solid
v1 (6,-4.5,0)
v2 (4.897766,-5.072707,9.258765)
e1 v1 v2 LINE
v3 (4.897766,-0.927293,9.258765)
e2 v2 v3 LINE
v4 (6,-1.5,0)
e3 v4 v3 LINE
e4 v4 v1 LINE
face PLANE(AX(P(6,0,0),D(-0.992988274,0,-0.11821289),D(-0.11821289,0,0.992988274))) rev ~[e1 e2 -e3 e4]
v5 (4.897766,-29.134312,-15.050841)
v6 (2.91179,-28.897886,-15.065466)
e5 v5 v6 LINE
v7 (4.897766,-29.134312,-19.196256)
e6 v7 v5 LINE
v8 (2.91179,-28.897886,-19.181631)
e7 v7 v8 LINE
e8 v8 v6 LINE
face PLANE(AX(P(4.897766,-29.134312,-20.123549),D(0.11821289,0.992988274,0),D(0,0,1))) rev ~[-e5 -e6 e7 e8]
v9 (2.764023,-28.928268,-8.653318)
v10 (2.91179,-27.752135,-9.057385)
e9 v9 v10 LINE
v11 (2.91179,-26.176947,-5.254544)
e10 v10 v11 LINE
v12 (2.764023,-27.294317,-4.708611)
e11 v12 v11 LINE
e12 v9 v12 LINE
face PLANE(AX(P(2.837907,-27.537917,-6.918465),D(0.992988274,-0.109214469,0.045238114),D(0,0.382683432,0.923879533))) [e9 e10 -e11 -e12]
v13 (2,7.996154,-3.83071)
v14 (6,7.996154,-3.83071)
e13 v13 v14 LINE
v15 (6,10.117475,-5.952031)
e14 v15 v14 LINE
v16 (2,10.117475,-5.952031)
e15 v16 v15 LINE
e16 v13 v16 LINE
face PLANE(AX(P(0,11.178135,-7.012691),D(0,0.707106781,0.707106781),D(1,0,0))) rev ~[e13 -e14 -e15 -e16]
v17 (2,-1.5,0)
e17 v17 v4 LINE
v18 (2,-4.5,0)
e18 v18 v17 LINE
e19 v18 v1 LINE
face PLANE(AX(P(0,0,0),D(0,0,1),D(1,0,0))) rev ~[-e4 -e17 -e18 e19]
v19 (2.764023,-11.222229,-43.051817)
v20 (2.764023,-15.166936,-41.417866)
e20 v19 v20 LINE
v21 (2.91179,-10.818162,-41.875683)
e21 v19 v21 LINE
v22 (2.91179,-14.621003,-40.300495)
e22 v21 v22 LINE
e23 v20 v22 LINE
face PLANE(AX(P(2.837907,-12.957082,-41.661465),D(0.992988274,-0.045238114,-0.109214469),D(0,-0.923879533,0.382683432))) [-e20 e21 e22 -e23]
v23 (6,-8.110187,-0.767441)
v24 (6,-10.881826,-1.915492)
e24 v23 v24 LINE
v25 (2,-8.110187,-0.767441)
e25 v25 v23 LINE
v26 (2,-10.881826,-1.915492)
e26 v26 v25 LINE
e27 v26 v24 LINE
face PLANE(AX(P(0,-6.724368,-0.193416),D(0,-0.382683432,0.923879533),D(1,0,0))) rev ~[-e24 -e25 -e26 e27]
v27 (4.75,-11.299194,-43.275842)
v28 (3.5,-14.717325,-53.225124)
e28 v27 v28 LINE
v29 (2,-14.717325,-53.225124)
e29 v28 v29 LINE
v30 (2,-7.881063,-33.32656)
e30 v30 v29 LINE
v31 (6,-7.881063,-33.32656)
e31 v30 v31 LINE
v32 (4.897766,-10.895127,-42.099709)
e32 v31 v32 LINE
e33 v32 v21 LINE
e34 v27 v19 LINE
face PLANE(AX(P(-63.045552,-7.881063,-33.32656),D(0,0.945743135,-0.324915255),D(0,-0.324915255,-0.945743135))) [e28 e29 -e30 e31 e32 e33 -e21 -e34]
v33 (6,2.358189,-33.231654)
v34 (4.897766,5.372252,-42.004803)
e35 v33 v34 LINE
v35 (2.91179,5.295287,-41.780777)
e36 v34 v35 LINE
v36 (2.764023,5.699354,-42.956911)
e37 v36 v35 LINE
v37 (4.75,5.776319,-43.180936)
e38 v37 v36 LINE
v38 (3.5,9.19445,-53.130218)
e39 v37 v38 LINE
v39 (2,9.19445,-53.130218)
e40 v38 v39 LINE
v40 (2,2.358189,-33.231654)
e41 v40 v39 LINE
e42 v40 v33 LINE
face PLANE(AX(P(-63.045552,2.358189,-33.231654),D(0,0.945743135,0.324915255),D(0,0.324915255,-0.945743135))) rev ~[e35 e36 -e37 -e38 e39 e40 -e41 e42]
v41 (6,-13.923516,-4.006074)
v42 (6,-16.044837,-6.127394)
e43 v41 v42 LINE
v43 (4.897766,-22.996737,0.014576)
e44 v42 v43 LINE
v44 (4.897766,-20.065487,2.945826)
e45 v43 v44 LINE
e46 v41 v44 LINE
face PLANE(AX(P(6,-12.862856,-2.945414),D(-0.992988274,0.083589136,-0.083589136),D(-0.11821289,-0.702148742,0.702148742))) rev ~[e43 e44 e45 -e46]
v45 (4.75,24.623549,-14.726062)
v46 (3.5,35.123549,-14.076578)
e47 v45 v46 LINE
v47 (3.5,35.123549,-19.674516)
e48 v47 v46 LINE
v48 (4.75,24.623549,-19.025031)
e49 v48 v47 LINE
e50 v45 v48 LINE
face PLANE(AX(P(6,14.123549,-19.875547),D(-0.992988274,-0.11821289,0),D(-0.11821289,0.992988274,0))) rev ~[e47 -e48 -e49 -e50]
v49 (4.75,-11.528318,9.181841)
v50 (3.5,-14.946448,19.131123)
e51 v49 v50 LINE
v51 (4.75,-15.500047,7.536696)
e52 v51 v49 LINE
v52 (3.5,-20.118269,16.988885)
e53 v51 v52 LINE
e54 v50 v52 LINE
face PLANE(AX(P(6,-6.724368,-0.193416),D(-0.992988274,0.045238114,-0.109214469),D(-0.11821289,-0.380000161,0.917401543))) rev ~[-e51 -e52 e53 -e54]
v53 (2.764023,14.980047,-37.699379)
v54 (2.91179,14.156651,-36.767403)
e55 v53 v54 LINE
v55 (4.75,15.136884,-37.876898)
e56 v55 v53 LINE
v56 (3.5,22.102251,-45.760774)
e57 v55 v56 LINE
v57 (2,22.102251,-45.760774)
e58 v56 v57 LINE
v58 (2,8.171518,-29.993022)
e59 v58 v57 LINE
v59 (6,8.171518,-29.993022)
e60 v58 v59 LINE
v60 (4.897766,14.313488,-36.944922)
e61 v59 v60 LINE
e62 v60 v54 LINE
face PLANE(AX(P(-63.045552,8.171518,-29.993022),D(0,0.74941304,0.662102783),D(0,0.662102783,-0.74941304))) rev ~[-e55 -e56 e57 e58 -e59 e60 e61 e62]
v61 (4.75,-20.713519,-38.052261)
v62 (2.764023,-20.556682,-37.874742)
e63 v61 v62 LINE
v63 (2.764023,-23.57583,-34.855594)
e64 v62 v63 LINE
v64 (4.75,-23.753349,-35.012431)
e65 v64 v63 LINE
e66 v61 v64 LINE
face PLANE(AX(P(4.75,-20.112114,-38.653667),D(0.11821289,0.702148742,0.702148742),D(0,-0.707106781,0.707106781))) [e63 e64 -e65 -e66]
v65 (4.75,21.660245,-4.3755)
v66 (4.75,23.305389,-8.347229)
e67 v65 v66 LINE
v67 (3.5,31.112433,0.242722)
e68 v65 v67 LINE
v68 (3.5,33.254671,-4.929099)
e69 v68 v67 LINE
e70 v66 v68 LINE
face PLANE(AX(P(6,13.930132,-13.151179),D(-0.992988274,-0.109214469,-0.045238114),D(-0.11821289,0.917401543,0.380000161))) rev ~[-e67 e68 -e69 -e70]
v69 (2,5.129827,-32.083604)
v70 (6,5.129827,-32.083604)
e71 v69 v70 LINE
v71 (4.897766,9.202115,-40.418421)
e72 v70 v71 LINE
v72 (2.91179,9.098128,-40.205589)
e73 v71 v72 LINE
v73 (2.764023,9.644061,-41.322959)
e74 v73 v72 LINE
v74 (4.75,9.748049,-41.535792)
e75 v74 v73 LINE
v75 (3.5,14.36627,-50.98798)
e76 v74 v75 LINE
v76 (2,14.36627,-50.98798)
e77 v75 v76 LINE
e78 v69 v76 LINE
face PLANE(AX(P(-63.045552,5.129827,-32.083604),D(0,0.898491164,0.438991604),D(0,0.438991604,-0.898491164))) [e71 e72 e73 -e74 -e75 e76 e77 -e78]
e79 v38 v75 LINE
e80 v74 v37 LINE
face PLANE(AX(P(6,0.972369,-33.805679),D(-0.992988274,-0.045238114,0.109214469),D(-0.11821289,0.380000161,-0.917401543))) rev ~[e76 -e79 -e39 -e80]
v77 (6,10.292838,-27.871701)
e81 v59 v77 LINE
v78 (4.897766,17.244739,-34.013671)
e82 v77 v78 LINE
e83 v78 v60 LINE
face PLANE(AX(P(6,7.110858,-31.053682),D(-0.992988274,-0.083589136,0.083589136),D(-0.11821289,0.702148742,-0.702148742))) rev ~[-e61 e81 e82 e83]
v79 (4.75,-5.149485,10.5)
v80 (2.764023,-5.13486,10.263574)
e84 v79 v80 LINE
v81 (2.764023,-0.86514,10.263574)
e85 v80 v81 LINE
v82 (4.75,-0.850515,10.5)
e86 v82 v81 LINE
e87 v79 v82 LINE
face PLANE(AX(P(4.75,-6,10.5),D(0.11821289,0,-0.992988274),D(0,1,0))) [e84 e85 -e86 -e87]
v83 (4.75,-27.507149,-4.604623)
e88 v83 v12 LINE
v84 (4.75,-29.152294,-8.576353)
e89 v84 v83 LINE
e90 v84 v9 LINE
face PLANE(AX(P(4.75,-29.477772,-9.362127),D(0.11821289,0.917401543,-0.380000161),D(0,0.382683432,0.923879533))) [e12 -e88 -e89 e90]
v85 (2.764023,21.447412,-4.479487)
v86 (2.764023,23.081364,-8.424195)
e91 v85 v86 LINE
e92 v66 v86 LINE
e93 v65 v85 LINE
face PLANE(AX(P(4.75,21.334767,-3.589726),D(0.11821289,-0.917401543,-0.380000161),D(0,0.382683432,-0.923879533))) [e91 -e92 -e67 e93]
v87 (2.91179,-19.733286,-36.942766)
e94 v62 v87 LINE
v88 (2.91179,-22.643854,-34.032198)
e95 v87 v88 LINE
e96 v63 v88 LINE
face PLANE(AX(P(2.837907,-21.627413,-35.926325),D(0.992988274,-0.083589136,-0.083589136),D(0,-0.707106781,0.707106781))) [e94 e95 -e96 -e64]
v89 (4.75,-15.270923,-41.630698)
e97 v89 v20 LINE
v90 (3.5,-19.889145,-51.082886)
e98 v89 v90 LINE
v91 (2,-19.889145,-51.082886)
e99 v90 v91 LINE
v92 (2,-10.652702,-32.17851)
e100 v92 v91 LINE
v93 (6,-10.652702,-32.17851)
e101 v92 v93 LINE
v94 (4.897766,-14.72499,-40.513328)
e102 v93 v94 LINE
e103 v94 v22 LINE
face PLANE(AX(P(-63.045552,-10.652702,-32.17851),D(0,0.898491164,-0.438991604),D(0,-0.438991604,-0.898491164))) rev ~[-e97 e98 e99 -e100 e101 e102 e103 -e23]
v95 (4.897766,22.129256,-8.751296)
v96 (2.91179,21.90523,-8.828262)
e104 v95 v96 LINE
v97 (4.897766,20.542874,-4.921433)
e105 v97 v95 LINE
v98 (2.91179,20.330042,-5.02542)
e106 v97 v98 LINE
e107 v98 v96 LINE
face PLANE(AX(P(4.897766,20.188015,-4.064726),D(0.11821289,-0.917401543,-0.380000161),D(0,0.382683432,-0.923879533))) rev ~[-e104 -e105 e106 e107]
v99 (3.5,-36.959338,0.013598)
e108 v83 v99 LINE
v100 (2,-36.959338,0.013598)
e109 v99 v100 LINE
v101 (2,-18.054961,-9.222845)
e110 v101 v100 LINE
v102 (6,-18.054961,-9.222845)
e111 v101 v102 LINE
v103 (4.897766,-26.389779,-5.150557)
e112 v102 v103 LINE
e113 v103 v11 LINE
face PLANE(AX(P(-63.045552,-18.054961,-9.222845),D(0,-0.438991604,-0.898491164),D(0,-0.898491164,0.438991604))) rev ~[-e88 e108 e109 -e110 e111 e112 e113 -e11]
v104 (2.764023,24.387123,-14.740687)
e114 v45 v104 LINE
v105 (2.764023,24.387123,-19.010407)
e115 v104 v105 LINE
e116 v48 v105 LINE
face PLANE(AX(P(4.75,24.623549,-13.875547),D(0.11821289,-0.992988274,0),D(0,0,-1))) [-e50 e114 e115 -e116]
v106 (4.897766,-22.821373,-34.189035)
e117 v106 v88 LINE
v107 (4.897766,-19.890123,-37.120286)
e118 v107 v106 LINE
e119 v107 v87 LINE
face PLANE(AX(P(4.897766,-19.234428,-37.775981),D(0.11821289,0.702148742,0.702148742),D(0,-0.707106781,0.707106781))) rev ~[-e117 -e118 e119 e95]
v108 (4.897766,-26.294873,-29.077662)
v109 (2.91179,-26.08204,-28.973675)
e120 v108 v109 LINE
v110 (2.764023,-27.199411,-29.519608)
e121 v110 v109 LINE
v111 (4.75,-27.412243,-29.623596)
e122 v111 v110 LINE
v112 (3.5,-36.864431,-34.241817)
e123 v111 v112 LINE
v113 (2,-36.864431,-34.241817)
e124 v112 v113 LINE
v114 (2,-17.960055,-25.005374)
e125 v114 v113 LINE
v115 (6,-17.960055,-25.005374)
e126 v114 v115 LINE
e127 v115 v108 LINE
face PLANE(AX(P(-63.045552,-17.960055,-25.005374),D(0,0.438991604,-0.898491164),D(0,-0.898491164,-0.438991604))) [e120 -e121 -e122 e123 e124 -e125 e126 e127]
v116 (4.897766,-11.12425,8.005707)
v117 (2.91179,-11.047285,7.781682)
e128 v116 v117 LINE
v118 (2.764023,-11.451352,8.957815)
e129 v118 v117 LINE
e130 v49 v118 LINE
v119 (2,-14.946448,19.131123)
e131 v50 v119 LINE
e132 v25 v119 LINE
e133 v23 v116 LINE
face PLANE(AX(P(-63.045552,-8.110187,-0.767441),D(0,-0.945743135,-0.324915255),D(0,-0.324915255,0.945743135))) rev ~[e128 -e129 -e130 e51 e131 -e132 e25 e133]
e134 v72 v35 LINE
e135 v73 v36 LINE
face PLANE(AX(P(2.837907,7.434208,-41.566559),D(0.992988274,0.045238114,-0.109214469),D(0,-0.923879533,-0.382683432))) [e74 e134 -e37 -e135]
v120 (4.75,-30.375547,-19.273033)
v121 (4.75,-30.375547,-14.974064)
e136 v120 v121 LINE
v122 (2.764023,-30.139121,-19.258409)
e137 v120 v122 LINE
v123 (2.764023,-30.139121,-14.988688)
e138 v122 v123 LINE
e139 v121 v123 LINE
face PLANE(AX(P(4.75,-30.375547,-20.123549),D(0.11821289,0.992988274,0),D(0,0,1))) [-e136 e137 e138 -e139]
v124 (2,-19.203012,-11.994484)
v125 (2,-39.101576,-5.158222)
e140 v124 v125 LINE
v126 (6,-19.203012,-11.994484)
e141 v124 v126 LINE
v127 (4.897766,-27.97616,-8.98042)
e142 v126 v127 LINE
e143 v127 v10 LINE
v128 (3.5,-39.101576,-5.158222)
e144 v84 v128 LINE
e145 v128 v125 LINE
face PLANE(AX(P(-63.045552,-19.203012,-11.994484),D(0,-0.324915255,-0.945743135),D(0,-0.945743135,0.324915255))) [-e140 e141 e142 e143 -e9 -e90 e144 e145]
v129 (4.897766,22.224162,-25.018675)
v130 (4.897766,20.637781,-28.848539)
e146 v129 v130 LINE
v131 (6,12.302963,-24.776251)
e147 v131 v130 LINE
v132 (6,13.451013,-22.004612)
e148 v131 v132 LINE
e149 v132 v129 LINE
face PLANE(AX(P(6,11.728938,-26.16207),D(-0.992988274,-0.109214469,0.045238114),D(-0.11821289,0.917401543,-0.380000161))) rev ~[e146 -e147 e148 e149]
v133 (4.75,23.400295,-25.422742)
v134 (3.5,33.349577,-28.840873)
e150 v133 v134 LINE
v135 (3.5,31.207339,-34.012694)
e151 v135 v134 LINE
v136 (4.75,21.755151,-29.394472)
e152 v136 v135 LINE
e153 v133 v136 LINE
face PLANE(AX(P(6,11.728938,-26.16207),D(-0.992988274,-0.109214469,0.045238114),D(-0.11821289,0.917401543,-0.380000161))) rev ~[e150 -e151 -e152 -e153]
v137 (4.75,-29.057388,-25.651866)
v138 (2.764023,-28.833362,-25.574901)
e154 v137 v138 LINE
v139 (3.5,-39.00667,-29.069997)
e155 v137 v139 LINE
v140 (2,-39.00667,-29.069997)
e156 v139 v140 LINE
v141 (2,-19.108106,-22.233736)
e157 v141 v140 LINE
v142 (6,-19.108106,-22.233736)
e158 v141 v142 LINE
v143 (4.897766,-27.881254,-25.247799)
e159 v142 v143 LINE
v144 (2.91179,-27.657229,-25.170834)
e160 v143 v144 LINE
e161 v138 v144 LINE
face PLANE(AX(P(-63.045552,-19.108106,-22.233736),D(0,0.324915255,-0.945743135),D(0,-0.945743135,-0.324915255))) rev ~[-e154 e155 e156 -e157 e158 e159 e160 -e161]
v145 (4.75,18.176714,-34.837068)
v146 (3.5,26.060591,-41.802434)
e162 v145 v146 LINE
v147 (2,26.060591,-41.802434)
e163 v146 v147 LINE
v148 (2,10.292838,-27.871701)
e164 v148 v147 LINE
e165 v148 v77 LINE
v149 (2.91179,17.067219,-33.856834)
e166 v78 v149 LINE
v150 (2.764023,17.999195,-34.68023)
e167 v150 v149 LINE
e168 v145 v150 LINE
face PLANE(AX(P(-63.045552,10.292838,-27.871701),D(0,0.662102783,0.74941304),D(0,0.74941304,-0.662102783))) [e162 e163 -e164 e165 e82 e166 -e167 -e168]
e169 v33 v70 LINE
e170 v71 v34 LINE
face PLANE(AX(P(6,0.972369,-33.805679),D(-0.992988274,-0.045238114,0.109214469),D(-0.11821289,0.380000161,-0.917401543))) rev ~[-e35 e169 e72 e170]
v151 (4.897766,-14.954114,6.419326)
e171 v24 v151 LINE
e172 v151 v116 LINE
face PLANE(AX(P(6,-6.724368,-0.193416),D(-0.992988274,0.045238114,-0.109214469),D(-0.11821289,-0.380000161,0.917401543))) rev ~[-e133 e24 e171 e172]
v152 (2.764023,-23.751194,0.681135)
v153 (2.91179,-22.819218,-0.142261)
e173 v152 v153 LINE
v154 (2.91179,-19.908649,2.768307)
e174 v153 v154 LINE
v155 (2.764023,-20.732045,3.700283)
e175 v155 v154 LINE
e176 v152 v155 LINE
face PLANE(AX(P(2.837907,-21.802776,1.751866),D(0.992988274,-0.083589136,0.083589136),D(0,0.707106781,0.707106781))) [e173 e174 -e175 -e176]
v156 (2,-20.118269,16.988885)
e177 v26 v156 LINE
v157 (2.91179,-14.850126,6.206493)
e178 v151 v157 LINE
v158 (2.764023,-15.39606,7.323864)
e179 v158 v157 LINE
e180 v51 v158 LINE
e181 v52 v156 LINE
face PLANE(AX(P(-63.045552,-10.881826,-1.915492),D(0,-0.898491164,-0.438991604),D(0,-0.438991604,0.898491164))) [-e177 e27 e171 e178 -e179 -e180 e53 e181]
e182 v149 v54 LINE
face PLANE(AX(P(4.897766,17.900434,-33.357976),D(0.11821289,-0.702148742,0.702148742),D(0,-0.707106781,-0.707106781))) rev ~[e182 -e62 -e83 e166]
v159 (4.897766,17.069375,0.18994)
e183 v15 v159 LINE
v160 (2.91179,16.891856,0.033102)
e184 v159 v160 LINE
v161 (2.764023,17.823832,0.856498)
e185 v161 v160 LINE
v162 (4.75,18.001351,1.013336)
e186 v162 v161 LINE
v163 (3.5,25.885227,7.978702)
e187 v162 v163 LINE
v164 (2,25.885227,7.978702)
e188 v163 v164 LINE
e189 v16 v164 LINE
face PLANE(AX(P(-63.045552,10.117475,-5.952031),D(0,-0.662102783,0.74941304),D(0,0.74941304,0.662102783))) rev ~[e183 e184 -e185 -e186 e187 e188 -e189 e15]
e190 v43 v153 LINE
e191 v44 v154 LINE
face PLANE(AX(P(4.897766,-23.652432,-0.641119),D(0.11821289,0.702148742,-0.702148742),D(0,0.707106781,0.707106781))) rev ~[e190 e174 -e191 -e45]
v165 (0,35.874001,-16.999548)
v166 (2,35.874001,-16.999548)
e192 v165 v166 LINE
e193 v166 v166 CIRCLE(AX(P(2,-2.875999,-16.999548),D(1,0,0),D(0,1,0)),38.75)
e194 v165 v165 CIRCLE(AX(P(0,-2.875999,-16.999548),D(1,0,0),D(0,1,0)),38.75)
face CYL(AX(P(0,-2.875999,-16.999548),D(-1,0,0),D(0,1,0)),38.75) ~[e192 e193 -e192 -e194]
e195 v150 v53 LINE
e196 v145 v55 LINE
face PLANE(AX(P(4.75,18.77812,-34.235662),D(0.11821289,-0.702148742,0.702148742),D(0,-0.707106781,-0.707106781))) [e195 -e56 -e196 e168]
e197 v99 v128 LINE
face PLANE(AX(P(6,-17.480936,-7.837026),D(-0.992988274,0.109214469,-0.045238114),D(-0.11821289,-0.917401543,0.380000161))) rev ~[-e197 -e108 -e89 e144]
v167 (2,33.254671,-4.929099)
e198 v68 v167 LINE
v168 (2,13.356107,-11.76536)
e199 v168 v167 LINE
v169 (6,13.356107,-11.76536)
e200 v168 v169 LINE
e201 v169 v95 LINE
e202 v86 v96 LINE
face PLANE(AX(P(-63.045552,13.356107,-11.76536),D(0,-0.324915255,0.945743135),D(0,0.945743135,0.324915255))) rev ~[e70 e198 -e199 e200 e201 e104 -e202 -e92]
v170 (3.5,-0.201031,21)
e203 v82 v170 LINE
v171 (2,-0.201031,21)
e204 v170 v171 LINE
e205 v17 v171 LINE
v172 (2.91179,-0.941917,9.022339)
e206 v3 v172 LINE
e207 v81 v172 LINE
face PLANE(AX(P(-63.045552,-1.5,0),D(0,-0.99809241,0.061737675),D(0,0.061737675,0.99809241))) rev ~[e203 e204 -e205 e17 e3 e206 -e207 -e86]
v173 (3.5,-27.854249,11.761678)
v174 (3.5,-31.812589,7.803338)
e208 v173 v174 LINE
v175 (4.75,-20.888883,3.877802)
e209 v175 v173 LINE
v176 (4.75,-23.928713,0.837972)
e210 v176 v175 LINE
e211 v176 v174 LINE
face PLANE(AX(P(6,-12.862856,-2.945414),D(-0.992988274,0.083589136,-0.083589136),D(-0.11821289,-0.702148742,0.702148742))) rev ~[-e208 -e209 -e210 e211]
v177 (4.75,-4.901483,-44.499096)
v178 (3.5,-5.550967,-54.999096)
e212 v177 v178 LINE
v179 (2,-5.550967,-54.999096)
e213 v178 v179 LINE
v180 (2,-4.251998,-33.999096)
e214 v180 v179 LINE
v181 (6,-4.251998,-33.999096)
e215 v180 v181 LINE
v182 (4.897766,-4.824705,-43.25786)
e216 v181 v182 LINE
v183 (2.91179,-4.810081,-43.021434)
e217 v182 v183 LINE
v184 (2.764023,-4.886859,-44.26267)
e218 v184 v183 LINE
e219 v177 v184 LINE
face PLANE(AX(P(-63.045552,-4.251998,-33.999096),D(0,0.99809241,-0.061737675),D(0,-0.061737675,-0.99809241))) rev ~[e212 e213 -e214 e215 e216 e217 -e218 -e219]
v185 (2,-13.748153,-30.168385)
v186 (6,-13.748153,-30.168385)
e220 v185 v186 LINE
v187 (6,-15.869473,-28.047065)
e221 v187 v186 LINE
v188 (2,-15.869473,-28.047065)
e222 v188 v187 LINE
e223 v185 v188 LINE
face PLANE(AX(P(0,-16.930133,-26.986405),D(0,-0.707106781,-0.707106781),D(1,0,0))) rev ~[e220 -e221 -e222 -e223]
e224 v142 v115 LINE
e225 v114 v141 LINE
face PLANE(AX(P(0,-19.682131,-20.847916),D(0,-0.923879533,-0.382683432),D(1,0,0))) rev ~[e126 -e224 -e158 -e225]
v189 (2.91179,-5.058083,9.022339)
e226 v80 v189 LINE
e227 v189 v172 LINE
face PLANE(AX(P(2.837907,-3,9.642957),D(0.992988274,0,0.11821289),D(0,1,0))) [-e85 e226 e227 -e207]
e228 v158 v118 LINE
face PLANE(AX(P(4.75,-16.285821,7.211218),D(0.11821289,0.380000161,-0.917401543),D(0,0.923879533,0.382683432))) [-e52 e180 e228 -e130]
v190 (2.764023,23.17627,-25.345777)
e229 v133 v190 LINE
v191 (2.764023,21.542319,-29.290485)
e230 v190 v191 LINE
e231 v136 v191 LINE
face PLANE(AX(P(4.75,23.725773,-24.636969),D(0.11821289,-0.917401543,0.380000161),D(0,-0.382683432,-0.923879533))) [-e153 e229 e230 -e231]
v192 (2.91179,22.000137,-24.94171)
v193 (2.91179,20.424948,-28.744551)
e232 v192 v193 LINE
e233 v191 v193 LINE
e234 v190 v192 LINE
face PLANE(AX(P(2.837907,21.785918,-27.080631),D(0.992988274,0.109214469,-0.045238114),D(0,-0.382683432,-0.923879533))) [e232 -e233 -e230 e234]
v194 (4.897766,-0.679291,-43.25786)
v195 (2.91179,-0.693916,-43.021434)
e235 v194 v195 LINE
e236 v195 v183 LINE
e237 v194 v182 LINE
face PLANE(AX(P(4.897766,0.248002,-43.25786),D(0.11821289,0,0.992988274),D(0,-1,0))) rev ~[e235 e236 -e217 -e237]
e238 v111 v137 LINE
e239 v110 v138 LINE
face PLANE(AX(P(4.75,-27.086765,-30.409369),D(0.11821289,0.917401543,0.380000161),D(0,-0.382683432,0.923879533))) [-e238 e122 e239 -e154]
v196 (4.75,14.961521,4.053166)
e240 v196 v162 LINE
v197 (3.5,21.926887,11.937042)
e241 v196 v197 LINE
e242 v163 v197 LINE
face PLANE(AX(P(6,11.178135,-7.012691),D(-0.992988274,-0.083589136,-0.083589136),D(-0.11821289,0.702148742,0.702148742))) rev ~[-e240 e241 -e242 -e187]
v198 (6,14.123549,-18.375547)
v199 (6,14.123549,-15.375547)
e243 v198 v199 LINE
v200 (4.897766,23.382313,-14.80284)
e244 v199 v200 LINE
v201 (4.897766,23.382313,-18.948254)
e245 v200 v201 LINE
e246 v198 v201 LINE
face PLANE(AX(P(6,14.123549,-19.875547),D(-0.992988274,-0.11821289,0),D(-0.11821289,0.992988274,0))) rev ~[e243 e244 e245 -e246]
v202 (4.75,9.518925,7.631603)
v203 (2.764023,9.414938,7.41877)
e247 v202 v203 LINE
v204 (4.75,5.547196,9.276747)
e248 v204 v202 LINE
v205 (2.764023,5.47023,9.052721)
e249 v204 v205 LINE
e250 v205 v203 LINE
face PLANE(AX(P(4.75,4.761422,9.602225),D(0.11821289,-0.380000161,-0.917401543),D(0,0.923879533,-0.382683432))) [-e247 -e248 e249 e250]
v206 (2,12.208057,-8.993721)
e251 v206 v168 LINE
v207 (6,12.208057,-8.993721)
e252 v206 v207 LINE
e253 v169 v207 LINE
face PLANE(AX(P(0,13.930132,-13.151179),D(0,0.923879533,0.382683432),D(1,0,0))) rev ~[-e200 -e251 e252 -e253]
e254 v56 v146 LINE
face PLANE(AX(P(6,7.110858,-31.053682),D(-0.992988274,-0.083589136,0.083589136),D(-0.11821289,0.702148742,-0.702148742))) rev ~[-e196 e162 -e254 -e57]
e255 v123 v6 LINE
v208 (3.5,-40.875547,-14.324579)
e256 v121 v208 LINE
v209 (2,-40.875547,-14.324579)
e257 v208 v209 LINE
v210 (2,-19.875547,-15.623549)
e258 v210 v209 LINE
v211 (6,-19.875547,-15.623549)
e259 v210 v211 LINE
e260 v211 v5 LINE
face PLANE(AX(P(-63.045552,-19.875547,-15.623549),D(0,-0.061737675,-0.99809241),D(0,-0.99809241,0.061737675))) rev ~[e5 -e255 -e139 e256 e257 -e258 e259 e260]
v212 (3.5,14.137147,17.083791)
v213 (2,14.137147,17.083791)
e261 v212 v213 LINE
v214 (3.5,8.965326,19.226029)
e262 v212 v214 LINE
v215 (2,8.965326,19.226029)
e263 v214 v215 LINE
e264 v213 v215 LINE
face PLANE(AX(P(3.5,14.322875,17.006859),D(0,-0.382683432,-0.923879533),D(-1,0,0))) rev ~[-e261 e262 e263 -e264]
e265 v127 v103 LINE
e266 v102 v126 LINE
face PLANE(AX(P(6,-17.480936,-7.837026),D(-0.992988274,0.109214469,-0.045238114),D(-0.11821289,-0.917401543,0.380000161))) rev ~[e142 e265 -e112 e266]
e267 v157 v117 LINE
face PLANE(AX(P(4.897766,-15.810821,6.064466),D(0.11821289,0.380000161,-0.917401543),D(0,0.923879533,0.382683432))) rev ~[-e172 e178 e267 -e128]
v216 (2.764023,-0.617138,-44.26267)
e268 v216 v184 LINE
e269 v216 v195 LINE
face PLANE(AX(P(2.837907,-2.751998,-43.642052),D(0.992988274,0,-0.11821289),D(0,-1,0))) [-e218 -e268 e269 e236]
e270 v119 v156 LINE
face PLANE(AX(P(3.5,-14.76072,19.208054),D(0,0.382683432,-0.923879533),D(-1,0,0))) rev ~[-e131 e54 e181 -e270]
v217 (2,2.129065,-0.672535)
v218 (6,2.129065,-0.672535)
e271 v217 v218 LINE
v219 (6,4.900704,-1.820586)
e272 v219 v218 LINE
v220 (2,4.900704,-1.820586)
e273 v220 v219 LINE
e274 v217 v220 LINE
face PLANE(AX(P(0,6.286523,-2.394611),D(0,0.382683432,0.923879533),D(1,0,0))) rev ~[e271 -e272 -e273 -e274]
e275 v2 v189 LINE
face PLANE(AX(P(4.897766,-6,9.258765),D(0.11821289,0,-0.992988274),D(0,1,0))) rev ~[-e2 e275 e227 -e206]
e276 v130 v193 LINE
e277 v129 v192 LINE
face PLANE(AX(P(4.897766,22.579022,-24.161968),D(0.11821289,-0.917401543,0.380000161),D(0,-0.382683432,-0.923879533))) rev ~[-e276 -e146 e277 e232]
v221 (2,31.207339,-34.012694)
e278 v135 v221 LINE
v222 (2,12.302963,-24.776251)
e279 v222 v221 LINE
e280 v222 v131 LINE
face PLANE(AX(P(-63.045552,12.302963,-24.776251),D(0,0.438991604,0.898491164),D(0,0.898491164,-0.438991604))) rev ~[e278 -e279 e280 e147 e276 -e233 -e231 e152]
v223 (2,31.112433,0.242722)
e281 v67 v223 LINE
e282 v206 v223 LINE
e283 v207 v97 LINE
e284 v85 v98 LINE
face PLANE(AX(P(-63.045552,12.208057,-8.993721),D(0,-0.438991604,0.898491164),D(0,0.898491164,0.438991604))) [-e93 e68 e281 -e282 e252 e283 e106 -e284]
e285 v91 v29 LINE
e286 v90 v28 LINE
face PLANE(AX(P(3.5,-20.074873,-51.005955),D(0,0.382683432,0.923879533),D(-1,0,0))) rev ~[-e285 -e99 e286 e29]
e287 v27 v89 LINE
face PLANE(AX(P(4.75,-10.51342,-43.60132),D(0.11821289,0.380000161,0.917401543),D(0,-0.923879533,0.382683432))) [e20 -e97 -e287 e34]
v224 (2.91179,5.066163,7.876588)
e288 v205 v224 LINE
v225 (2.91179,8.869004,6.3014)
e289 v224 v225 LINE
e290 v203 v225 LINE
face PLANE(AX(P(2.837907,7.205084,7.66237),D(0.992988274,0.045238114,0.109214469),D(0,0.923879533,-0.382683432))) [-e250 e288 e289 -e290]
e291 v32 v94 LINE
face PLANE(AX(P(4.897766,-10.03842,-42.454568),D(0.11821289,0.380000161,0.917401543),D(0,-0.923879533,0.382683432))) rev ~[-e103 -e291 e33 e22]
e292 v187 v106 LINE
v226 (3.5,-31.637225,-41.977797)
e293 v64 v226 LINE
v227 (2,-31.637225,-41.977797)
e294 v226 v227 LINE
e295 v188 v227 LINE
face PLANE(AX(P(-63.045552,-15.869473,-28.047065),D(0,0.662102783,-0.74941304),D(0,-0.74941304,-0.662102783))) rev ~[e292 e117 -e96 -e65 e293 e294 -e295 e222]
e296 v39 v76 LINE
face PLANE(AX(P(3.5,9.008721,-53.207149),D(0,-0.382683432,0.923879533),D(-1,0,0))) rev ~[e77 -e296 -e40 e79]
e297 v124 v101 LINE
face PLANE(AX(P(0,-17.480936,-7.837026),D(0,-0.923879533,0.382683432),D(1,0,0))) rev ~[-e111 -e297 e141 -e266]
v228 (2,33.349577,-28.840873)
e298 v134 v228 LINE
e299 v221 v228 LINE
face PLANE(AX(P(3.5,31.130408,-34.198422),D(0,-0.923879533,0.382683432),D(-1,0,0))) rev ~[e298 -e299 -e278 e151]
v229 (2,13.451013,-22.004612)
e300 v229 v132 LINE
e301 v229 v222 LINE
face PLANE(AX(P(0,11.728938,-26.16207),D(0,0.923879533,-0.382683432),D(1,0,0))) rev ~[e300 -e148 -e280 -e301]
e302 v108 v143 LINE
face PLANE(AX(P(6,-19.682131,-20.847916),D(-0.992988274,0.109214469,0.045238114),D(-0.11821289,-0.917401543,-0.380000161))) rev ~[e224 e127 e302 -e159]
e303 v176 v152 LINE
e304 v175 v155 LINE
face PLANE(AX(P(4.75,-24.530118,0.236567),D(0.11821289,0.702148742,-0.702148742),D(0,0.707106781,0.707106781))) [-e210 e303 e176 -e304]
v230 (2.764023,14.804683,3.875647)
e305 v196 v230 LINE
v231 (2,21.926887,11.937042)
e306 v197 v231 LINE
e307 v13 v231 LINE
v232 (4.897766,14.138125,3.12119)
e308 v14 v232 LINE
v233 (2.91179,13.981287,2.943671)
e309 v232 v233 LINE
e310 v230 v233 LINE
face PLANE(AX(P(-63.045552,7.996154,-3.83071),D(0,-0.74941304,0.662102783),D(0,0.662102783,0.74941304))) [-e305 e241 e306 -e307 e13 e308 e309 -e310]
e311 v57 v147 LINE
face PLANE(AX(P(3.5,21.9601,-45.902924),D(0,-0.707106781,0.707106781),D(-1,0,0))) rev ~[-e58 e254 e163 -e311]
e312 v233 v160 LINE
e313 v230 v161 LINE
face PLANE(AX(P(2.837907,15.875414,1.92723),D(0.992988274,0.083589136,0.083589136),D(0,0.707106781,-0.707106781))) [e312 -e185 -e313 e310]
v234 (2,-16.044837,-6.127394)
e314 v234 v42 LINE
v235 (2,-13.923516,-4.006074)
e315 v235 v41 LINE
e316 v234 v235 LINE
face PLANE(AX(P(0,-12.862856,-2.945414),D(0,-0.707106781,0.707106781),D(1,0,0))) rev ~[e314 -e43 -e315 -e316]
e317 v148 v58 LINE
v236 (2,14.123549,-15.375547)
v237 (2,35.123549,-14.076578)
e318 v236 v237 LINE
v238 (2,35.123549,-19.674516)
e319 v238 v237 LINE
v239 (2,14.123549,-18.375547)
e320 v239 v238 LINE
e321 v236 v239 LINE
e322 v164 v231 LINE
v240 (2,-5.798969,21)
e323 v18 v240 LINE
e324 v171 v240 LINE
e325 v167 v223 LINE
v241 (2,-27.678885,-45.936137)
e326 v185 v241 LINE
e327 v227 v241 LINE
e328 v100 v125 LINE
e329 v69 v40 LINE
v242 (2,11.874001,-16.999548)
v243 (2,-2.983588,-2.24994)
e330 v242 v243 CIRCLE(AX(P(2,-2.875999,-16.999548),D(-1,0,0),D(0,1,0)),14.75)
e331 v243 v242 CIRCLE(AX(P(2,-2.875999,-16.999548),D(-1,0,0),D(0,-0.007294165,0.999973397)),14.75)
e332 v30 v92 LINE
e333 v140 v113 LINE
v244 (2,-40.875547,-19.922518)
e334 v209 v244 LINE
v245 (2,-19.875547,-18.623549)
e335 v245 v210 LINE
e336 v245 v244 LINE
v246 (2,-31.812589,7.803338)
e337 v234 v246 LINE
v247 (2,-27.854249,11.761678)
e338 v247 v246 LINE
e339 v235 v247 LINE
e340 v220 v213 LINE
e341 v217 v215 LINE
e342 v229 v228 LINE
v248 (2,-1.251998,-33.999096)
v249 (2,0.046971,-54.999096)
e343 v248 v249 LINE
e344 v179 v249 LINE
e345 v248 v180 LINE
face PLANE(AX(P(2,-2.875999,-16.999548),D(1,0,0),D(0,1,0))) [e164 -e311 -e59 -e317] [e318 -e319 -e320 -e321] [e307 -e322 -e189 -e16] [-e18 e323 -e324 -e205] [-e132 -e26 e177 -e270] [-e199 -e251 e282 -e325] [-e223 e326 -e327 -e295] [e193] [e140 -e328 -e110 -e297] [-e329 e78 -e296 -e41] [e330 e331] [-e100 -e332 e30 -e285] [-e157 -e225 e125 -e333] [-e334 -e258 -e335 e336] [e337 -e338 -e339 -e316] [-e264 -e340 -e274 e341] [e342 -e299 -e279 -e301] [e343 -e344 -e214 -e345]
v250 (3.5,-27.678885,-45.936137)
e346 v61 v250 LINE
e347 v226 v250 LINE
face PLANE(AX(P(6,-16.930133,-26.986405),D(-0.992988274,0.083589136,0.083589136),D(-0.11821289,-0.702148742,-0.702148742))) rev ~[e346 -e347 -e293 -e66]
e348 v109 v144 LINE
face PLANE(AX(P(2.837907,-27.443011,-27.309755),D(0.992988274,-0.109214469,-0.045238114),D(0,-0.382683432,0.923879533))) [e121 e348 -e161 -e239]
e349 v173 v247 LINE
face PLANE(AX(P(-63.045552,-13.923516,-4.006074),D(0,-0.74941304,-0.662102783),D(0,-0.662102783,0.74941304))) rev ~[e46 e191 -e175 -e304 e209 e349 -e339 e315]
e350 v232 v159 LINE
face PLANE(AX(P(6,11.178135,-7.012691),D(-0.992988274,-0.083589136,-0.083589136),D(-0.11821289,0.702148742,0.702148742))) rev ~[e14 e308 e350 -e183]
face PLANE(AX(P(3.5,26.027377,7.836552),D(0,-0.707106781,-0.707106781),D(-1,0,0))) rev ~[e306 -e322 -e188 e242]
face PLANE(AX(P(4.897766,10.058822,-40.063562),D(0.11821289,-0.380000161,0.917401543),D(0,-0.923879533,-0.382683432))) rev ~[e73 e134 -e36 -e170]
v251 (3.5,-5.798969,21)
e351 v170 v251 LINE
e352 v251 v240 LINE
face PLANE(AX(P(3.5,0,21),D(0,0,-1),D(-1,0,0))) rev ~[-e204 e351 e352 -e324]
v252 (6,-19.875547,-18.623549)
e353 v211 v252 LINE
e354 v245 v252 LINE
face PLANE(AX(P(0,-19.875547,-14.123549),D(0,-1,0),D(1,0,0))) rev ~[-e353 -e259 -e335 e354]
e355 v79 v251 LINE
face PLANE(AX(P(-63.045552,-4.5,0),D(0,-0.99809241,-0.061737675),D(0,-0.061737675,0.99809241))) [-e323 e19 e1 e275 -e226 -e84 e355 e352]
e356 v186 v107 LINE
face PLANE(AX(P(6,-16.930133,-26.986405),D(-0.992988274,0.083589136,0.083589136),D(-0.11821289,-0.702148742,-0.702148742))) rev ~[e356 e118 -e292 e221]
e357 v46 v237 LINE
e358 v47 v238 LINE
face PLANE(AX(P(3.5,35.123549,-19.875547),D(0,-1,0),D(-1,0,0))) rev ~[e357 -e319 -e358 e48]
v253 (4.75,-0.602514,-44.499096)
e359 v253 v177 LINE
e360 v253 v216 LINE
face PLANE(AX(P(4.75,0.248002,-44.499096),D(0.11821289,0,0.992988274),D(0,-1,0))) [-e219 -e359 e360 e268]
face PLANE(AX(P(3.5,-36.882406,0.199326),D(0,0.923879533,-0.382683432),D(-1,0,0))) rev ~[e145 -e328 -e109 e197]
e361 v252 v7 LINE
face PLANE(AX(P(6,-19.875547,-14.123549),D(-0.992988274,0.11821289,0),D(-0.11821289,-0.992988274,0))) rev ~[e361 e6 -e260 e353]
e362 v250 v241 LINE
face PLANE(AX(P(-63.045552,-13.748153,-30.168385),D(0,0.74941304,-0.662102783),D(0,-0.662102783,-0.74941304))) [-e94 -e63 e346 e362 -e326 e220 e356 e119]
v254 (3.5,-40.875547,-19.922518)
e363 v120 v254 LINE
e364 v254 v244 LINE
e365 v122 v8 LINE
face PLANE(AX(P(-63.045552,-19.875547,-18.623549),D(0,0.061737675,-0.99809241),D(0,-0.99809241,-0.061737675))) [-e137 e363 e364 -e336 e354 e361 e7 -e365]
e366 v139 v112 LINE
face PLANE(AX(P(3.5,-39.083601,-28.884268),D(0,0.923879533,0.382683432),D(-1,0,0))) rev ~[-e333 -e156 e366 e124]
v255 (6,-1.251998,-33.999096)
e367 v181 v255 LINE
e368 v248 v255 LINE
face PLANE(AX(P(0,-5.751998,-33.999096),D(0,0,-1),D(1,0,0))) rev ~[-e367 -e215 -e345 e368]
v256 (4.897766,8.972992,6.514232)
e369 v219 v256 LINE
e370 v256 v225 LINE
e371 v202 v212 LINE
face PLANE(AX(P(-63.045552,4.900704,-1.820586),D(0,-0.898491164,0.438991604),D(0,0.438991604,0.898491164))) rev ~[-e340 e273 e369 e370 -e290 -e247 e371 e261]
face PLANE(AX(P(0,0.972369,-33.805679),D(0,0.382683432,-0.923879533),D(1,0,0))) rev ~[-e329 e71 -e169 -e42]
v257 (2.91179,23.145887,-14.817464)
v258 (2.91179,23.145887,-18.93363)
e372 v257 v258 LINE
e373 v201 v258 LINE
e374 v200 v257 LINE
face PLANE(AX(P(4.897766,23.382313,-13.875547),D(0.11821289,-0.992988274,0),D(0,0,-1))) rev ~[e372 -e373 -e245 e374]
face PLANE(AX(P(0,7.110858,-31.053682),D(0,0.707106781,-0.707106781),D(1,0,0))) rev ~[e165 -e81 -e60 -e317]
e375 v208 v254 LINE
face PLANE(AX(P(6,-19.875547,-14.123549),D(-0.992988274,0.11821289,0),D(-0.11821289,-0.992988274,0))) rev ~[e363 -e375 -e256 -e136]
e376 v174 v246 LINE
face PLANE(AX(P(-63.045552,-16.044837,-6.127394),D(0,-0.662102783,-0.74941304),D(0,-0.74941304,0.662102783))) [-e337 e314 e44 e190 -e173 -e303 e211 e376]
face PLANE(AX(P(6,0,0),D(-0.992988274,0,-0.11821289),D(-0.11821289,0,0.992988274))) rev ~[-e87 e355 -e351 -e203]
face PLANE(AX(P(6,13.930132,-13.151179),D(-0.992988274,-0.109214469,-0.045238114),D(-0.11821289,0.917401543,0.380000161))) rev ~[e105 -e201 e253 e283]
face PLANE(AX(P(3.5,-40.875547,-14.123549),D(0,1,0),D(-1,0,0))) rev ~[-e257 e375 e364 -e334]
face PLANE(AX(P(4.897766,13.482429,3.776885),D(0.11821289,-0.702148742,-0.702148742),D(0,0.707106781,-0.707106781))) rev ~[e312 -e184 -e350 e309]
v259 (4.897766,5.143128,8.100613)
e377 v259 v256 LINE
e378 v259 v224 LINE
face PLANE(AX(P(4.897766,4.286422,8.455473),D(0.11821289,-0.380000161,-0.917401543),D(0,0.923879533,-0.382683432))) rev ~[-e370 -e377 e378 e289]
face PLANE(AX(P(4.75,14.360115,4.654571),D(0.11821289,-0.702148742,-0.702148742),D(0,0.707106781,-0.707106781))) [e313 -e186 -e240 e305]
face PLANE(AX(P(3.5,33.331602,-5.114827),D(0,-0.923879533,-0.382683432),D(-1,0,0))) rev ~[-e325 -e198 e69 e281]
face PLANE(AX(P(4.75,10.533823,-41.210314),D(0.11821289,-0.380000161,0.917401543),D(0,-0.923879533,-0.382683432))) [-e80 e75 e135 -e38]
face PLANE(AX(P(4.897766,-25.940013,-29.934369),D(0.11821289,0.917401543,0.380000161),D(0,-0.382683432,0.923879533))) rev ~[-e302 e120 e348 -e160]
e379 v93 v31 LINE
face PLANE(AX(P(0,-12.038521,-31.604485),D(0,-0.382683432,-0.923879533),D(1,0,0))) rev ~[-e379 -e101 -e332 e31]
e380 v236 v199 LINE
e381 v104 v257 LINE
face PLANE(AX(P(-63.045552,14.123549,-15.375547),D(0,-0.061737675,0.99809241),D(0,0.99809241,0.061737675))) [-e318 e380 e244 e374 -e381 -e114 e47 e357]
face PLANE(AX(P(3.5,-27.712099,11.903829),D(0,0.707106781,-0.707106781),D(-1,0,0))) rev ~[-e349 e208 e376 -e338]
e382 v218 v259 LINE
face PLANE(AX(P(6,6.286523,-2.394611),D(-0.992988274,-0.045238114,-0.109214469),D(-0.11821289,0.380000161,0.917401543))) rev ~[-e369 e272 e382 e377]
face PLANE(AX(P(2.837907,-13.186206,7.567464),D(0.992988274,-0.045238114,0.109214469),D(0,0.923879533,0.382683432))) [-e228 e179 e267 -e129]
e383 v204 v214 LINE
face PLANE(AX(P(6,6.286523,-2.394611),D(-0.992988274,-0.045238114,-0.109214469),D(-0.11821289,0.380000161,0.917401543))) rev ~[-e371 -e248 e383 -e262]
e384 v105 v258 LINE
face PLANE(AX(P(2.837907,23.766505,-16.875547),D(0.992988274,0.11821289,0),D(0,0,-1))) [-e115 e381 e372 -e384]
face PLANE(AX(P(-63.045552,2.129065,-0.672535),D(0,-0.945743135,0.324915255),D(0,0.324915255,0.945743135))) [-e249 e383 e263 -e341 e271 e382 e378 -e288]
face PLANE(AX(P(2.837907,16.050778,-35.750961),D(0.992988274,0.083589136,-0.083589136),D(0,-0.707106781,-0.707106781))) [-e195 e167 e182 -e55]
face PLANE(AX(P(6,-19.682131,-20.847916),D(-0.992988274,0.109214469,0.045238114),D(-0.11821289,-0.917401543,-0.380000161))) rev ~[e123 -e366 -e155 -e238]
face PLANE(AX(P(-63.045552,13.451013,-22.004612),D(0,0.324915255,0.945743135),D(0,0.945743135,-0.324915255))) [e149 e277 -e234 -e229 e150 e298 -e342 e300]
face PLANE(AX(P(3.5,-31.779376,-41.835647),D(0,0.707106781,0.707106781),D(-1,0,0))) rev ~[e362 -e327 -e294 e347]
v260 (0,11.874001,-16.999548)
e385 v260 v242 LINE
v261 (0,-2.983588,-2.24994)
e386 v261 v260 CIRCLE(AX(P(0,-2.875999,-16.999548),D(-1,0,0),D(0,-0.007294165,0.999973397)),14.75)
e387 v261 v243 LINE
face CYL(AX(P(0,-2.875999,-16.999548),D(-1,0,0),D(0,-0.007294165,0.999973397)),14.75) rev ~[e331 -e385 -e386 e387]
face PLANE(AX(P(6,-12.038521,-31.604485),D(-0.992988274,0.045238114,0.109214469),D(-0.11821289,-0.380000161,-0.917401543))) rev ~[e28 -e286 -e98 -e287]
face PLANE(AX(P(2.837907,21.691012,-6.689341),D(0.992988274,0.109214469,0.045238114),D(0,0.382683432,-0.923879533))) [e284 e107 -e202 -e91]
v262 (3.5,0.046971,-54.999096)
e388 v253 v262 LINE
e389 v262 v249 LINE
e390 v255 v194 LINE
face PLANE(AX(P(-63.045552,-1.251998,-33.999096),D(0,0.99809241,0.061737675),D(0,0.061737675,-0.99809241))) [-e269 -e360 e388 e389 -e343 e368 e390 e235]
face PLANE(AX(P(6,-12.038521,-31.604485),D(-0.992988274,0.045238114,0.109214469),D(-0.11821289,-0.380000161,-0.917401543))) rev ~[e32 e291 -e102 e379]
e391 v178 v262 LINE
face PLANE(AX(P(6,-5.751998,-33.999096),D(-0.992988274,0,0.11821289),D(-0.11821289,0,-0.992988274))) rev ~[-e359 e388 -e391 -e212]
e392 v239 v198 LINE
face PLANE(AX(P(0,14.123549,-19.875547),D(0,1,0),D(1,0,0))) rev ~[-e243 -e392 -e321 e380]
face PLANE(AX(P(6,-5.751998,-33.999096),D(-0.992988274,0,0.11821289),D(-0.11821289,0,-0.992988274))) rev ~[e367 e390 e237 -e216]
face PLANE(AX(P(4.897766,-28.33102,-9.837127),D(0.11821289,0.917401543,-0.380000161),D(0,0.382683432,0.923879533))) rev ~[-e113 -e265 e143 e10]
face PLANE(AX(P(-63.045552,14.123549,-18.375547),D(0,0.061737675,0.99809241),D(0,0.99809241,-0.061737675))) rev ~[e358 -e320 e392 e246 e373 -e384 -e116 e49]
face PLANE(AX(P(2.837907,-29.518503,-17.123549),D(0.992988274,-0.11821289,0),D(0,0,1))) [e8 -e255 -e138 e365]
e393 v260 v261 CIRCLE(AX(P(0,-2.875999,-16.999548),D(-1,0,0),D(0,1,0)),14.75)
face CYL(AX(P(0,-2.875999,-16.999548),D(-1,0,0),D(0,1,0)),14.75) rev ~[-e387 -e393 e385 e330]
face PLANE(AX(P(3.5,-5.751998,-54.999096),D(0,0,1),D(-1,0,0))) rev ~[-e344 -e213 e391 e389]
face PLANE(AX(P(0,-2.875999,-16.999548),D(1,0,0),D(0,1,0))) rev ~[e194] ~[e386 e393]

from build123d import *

# Parameters (mm, degrees)
F1_DEPTH    = 6
F2_W        = 6
F2_H        = 1.25
F3_DEPTH    = 2
F4_T1_DEPTH = 132.091103715
F6_COUNT    = 16
F5_R        = 38.75
F7_DEPTH    = 2


# Not quite as in the source:
# - a fillet or chamfer that OpenCascade refuses, or shapes differently, is made with other operations: its cross-section is extruded or revolved along the edge and cut away or added


with BuildPart() as f1:
    # F0 (on Front) → F1 (new body)
    with BuildSketch(Plane.XZ):
        Polygon((0, 21), (0, 0), (6, 0), (3.5, 21), align=None)
    extrude(amount=F1_DEPTH)

    # F2 (on face) → F3 (cut)
    with BuildSketch(Plane(origin=(5.9161542761, 0, 0.7043040805), x_dir=(0, 1, 0), z_dir=(0.9929882742, 0, 0.1182128898))):
        with Locations((-3, 9.2398656526)):
            Rectangle(F2_W, F2_H)
    extrude(amount=-F3_DEPTH, mode=Mode.SUBTRACT)

    # F4: chamfer of 1.5 x 24.25 on 2 edges, made by hand

    # F4_s2 → F4_t1 (cut)
    with BuildSketch(Plane.YZ.offset(-63.0455518575)):
        Polygon((-4.5, 0), (-6, 24.25), (-6, 0), align=None)
        Polygon((-1.5, 0), (0, 24.25), (0, 0), align=None)
    extrude(amount=F4_T1_DEPTH, mode=Mode.SUBTRACT)


with BuildPart() as f6_1:
    # F6: instance of F1
    add(f1.part.rotate(Axis((0, -2.8759991925, -16.9995477528), (1, 0, 0)), 1 * 360 / F6_COUNT))


with BuildPart() as f6_2:
    # F6: instance of F1
    add(f1.part.rotate(Axis((0, -2.8759991925, -16.9995477528), (1, 0, 0)), 2 * 360 / F6_COUNT))


with BuildPart() as f6_3:
    # F6: instance of F1
    add(f1.part.rotate(Axis((0, -2.8759991925, -16.9995477528), (1, 0, 0)), 3 * 360 / F6_COUNT))


with BuildPart() as f6_4:
    # F6: instance of F1
    add(f1.part.rotate(Axis((0, -2.8759991925, -16.9995477528), (1, 0, 0)), 4 * 360 / F6_COUNT))


with BuildPart() as f6_5:
    # F6: instance of F1
    add(f1.part.rotate(Axis((0, -2.8759991925, -16.9995477528), (1, 0, 0)), 5 * 360 / F6_COUNT))


with BuildPart() as f6_6:
    # F6: instance of F1
    add(f1.part.rotate(Axis((0, -2.8759991925, -16.9995477528), (1, 0, 0)), 6 * 360 / F6_COUNT))


with BuildPart() as f6_7:
    # F6: instance of F1
    add(f1.part.rotate(Axis((0, -2.8759991925, -16.9995477528), (1, 0, 0)), 7 * 360 / F6_COUNT))


with BuildPart() as f6_8:
    # F6: instance of F1
    add(f1.part.rotate(Axis((0, -2.8759991925, -16.9995477528), (1, 0, 0)), 8 * 360 / F6_COUNT))


with BuildPart() as f6_9:
    # F6: instance of F1
    add(f1.part.rotate(Axis((0, -2.8759991925, -16.9995477528), (1, 0, 0)), 9 * 360 / F6_COUNT))


with BuildPart() as f6_10:
    # F6: instance of F1
    add(f1.part.rotate(Axis((0, -2.8759991925, -16.9995477528), (1, 0, 0)), 10 * 360 / F6_COUNT))


with BuildPart() as f6_11:
    # F6: instance of F1
    add(f1.part.rotate(Axis((0, -2.8759991925, -16.9995477528), (1, 0, 0)), 11 * 360 / F6_COUNT))


with BuildPart() as f6_12:
    # F6: instance of F1
    add(f1.part.rotate(Axis((0, -2.8759991925, -16.9995477528), (1, 0, 0)), 12 * 360 / F6_COUNT))


with BuildPart() as f6_13:
    # F6: instance of F1
    add(f1.part.rotate(Axis((0, -2.8759991925, -16.9995477528), (1, 0, 0)), 13 * 360 / F6_COUNT))


with BuildPart() as f6_14:
    # F6: instance of F1
    add(f1.part.rotate(Axis((0, -2.8759991925, -16.9995477528), (1, 0, 0)), 14 * 360 / F6_COUNT))


with BuildPart() as f6_15:
    # F6: instance of F1
    add(f1.part.rotate(Axis((0, -2.8759991925, -16.9995477528), (1, 0, 0)), 15 * 360 / F6_COUNT))


with BuildPart() as f1_1:
    add(f1.part)

    add(f6_1.part)  # F7 merges F6_1

    add(f6_2.part)  # F7 merges F6_2

    add(f6_3.part)  # F7 merges F6_3

    add(f6_4.part)  # F7 merges F6_4

    add(f6_5.part)  # F7 merges F6_5

    add(f6_6.part)  # F7 merges F6_6

    add(f6_7.part)  # F7 merges F6_7

    add(f6_8.part)  # F7 merges F6_8

    add(f6_9.part)  # F7 merges F6_9

    add(f6_10.part)  # F7 merges F6_10

    add(f6_11.part)  # F7 merges F6_11

    add(f6_12.part)  # F7 merges F6_12

    add(f6_13.part)  # F7 merges F6_13

    add(f6_14.part)  # F7 merges F6_14

    add(f6_15.part)  # F7 merges F6_15
    # F5 (on Right) → F7 (join)
    with BuildSketch(Plane.YZ):
        with Locations((-2.8759991925, -16.9995477528)):
            Circle(F5_R)
        with BuildLine():
            ThreePointArc((-2.9835881284, -2.2499401438), (7.5157177781, -6.53175341), (11.8740008075, -16.9995477528))
            ThreePointArc((11.8740008075, -16.9995477528), (-13.2677161631, -27.4673420956), (-2.9835881284, -2.2499401438))
        make_face(mode=Mode.SUBTRACT)
    extrude(amount=F7_DEPTH)


solid = f1_1.part
